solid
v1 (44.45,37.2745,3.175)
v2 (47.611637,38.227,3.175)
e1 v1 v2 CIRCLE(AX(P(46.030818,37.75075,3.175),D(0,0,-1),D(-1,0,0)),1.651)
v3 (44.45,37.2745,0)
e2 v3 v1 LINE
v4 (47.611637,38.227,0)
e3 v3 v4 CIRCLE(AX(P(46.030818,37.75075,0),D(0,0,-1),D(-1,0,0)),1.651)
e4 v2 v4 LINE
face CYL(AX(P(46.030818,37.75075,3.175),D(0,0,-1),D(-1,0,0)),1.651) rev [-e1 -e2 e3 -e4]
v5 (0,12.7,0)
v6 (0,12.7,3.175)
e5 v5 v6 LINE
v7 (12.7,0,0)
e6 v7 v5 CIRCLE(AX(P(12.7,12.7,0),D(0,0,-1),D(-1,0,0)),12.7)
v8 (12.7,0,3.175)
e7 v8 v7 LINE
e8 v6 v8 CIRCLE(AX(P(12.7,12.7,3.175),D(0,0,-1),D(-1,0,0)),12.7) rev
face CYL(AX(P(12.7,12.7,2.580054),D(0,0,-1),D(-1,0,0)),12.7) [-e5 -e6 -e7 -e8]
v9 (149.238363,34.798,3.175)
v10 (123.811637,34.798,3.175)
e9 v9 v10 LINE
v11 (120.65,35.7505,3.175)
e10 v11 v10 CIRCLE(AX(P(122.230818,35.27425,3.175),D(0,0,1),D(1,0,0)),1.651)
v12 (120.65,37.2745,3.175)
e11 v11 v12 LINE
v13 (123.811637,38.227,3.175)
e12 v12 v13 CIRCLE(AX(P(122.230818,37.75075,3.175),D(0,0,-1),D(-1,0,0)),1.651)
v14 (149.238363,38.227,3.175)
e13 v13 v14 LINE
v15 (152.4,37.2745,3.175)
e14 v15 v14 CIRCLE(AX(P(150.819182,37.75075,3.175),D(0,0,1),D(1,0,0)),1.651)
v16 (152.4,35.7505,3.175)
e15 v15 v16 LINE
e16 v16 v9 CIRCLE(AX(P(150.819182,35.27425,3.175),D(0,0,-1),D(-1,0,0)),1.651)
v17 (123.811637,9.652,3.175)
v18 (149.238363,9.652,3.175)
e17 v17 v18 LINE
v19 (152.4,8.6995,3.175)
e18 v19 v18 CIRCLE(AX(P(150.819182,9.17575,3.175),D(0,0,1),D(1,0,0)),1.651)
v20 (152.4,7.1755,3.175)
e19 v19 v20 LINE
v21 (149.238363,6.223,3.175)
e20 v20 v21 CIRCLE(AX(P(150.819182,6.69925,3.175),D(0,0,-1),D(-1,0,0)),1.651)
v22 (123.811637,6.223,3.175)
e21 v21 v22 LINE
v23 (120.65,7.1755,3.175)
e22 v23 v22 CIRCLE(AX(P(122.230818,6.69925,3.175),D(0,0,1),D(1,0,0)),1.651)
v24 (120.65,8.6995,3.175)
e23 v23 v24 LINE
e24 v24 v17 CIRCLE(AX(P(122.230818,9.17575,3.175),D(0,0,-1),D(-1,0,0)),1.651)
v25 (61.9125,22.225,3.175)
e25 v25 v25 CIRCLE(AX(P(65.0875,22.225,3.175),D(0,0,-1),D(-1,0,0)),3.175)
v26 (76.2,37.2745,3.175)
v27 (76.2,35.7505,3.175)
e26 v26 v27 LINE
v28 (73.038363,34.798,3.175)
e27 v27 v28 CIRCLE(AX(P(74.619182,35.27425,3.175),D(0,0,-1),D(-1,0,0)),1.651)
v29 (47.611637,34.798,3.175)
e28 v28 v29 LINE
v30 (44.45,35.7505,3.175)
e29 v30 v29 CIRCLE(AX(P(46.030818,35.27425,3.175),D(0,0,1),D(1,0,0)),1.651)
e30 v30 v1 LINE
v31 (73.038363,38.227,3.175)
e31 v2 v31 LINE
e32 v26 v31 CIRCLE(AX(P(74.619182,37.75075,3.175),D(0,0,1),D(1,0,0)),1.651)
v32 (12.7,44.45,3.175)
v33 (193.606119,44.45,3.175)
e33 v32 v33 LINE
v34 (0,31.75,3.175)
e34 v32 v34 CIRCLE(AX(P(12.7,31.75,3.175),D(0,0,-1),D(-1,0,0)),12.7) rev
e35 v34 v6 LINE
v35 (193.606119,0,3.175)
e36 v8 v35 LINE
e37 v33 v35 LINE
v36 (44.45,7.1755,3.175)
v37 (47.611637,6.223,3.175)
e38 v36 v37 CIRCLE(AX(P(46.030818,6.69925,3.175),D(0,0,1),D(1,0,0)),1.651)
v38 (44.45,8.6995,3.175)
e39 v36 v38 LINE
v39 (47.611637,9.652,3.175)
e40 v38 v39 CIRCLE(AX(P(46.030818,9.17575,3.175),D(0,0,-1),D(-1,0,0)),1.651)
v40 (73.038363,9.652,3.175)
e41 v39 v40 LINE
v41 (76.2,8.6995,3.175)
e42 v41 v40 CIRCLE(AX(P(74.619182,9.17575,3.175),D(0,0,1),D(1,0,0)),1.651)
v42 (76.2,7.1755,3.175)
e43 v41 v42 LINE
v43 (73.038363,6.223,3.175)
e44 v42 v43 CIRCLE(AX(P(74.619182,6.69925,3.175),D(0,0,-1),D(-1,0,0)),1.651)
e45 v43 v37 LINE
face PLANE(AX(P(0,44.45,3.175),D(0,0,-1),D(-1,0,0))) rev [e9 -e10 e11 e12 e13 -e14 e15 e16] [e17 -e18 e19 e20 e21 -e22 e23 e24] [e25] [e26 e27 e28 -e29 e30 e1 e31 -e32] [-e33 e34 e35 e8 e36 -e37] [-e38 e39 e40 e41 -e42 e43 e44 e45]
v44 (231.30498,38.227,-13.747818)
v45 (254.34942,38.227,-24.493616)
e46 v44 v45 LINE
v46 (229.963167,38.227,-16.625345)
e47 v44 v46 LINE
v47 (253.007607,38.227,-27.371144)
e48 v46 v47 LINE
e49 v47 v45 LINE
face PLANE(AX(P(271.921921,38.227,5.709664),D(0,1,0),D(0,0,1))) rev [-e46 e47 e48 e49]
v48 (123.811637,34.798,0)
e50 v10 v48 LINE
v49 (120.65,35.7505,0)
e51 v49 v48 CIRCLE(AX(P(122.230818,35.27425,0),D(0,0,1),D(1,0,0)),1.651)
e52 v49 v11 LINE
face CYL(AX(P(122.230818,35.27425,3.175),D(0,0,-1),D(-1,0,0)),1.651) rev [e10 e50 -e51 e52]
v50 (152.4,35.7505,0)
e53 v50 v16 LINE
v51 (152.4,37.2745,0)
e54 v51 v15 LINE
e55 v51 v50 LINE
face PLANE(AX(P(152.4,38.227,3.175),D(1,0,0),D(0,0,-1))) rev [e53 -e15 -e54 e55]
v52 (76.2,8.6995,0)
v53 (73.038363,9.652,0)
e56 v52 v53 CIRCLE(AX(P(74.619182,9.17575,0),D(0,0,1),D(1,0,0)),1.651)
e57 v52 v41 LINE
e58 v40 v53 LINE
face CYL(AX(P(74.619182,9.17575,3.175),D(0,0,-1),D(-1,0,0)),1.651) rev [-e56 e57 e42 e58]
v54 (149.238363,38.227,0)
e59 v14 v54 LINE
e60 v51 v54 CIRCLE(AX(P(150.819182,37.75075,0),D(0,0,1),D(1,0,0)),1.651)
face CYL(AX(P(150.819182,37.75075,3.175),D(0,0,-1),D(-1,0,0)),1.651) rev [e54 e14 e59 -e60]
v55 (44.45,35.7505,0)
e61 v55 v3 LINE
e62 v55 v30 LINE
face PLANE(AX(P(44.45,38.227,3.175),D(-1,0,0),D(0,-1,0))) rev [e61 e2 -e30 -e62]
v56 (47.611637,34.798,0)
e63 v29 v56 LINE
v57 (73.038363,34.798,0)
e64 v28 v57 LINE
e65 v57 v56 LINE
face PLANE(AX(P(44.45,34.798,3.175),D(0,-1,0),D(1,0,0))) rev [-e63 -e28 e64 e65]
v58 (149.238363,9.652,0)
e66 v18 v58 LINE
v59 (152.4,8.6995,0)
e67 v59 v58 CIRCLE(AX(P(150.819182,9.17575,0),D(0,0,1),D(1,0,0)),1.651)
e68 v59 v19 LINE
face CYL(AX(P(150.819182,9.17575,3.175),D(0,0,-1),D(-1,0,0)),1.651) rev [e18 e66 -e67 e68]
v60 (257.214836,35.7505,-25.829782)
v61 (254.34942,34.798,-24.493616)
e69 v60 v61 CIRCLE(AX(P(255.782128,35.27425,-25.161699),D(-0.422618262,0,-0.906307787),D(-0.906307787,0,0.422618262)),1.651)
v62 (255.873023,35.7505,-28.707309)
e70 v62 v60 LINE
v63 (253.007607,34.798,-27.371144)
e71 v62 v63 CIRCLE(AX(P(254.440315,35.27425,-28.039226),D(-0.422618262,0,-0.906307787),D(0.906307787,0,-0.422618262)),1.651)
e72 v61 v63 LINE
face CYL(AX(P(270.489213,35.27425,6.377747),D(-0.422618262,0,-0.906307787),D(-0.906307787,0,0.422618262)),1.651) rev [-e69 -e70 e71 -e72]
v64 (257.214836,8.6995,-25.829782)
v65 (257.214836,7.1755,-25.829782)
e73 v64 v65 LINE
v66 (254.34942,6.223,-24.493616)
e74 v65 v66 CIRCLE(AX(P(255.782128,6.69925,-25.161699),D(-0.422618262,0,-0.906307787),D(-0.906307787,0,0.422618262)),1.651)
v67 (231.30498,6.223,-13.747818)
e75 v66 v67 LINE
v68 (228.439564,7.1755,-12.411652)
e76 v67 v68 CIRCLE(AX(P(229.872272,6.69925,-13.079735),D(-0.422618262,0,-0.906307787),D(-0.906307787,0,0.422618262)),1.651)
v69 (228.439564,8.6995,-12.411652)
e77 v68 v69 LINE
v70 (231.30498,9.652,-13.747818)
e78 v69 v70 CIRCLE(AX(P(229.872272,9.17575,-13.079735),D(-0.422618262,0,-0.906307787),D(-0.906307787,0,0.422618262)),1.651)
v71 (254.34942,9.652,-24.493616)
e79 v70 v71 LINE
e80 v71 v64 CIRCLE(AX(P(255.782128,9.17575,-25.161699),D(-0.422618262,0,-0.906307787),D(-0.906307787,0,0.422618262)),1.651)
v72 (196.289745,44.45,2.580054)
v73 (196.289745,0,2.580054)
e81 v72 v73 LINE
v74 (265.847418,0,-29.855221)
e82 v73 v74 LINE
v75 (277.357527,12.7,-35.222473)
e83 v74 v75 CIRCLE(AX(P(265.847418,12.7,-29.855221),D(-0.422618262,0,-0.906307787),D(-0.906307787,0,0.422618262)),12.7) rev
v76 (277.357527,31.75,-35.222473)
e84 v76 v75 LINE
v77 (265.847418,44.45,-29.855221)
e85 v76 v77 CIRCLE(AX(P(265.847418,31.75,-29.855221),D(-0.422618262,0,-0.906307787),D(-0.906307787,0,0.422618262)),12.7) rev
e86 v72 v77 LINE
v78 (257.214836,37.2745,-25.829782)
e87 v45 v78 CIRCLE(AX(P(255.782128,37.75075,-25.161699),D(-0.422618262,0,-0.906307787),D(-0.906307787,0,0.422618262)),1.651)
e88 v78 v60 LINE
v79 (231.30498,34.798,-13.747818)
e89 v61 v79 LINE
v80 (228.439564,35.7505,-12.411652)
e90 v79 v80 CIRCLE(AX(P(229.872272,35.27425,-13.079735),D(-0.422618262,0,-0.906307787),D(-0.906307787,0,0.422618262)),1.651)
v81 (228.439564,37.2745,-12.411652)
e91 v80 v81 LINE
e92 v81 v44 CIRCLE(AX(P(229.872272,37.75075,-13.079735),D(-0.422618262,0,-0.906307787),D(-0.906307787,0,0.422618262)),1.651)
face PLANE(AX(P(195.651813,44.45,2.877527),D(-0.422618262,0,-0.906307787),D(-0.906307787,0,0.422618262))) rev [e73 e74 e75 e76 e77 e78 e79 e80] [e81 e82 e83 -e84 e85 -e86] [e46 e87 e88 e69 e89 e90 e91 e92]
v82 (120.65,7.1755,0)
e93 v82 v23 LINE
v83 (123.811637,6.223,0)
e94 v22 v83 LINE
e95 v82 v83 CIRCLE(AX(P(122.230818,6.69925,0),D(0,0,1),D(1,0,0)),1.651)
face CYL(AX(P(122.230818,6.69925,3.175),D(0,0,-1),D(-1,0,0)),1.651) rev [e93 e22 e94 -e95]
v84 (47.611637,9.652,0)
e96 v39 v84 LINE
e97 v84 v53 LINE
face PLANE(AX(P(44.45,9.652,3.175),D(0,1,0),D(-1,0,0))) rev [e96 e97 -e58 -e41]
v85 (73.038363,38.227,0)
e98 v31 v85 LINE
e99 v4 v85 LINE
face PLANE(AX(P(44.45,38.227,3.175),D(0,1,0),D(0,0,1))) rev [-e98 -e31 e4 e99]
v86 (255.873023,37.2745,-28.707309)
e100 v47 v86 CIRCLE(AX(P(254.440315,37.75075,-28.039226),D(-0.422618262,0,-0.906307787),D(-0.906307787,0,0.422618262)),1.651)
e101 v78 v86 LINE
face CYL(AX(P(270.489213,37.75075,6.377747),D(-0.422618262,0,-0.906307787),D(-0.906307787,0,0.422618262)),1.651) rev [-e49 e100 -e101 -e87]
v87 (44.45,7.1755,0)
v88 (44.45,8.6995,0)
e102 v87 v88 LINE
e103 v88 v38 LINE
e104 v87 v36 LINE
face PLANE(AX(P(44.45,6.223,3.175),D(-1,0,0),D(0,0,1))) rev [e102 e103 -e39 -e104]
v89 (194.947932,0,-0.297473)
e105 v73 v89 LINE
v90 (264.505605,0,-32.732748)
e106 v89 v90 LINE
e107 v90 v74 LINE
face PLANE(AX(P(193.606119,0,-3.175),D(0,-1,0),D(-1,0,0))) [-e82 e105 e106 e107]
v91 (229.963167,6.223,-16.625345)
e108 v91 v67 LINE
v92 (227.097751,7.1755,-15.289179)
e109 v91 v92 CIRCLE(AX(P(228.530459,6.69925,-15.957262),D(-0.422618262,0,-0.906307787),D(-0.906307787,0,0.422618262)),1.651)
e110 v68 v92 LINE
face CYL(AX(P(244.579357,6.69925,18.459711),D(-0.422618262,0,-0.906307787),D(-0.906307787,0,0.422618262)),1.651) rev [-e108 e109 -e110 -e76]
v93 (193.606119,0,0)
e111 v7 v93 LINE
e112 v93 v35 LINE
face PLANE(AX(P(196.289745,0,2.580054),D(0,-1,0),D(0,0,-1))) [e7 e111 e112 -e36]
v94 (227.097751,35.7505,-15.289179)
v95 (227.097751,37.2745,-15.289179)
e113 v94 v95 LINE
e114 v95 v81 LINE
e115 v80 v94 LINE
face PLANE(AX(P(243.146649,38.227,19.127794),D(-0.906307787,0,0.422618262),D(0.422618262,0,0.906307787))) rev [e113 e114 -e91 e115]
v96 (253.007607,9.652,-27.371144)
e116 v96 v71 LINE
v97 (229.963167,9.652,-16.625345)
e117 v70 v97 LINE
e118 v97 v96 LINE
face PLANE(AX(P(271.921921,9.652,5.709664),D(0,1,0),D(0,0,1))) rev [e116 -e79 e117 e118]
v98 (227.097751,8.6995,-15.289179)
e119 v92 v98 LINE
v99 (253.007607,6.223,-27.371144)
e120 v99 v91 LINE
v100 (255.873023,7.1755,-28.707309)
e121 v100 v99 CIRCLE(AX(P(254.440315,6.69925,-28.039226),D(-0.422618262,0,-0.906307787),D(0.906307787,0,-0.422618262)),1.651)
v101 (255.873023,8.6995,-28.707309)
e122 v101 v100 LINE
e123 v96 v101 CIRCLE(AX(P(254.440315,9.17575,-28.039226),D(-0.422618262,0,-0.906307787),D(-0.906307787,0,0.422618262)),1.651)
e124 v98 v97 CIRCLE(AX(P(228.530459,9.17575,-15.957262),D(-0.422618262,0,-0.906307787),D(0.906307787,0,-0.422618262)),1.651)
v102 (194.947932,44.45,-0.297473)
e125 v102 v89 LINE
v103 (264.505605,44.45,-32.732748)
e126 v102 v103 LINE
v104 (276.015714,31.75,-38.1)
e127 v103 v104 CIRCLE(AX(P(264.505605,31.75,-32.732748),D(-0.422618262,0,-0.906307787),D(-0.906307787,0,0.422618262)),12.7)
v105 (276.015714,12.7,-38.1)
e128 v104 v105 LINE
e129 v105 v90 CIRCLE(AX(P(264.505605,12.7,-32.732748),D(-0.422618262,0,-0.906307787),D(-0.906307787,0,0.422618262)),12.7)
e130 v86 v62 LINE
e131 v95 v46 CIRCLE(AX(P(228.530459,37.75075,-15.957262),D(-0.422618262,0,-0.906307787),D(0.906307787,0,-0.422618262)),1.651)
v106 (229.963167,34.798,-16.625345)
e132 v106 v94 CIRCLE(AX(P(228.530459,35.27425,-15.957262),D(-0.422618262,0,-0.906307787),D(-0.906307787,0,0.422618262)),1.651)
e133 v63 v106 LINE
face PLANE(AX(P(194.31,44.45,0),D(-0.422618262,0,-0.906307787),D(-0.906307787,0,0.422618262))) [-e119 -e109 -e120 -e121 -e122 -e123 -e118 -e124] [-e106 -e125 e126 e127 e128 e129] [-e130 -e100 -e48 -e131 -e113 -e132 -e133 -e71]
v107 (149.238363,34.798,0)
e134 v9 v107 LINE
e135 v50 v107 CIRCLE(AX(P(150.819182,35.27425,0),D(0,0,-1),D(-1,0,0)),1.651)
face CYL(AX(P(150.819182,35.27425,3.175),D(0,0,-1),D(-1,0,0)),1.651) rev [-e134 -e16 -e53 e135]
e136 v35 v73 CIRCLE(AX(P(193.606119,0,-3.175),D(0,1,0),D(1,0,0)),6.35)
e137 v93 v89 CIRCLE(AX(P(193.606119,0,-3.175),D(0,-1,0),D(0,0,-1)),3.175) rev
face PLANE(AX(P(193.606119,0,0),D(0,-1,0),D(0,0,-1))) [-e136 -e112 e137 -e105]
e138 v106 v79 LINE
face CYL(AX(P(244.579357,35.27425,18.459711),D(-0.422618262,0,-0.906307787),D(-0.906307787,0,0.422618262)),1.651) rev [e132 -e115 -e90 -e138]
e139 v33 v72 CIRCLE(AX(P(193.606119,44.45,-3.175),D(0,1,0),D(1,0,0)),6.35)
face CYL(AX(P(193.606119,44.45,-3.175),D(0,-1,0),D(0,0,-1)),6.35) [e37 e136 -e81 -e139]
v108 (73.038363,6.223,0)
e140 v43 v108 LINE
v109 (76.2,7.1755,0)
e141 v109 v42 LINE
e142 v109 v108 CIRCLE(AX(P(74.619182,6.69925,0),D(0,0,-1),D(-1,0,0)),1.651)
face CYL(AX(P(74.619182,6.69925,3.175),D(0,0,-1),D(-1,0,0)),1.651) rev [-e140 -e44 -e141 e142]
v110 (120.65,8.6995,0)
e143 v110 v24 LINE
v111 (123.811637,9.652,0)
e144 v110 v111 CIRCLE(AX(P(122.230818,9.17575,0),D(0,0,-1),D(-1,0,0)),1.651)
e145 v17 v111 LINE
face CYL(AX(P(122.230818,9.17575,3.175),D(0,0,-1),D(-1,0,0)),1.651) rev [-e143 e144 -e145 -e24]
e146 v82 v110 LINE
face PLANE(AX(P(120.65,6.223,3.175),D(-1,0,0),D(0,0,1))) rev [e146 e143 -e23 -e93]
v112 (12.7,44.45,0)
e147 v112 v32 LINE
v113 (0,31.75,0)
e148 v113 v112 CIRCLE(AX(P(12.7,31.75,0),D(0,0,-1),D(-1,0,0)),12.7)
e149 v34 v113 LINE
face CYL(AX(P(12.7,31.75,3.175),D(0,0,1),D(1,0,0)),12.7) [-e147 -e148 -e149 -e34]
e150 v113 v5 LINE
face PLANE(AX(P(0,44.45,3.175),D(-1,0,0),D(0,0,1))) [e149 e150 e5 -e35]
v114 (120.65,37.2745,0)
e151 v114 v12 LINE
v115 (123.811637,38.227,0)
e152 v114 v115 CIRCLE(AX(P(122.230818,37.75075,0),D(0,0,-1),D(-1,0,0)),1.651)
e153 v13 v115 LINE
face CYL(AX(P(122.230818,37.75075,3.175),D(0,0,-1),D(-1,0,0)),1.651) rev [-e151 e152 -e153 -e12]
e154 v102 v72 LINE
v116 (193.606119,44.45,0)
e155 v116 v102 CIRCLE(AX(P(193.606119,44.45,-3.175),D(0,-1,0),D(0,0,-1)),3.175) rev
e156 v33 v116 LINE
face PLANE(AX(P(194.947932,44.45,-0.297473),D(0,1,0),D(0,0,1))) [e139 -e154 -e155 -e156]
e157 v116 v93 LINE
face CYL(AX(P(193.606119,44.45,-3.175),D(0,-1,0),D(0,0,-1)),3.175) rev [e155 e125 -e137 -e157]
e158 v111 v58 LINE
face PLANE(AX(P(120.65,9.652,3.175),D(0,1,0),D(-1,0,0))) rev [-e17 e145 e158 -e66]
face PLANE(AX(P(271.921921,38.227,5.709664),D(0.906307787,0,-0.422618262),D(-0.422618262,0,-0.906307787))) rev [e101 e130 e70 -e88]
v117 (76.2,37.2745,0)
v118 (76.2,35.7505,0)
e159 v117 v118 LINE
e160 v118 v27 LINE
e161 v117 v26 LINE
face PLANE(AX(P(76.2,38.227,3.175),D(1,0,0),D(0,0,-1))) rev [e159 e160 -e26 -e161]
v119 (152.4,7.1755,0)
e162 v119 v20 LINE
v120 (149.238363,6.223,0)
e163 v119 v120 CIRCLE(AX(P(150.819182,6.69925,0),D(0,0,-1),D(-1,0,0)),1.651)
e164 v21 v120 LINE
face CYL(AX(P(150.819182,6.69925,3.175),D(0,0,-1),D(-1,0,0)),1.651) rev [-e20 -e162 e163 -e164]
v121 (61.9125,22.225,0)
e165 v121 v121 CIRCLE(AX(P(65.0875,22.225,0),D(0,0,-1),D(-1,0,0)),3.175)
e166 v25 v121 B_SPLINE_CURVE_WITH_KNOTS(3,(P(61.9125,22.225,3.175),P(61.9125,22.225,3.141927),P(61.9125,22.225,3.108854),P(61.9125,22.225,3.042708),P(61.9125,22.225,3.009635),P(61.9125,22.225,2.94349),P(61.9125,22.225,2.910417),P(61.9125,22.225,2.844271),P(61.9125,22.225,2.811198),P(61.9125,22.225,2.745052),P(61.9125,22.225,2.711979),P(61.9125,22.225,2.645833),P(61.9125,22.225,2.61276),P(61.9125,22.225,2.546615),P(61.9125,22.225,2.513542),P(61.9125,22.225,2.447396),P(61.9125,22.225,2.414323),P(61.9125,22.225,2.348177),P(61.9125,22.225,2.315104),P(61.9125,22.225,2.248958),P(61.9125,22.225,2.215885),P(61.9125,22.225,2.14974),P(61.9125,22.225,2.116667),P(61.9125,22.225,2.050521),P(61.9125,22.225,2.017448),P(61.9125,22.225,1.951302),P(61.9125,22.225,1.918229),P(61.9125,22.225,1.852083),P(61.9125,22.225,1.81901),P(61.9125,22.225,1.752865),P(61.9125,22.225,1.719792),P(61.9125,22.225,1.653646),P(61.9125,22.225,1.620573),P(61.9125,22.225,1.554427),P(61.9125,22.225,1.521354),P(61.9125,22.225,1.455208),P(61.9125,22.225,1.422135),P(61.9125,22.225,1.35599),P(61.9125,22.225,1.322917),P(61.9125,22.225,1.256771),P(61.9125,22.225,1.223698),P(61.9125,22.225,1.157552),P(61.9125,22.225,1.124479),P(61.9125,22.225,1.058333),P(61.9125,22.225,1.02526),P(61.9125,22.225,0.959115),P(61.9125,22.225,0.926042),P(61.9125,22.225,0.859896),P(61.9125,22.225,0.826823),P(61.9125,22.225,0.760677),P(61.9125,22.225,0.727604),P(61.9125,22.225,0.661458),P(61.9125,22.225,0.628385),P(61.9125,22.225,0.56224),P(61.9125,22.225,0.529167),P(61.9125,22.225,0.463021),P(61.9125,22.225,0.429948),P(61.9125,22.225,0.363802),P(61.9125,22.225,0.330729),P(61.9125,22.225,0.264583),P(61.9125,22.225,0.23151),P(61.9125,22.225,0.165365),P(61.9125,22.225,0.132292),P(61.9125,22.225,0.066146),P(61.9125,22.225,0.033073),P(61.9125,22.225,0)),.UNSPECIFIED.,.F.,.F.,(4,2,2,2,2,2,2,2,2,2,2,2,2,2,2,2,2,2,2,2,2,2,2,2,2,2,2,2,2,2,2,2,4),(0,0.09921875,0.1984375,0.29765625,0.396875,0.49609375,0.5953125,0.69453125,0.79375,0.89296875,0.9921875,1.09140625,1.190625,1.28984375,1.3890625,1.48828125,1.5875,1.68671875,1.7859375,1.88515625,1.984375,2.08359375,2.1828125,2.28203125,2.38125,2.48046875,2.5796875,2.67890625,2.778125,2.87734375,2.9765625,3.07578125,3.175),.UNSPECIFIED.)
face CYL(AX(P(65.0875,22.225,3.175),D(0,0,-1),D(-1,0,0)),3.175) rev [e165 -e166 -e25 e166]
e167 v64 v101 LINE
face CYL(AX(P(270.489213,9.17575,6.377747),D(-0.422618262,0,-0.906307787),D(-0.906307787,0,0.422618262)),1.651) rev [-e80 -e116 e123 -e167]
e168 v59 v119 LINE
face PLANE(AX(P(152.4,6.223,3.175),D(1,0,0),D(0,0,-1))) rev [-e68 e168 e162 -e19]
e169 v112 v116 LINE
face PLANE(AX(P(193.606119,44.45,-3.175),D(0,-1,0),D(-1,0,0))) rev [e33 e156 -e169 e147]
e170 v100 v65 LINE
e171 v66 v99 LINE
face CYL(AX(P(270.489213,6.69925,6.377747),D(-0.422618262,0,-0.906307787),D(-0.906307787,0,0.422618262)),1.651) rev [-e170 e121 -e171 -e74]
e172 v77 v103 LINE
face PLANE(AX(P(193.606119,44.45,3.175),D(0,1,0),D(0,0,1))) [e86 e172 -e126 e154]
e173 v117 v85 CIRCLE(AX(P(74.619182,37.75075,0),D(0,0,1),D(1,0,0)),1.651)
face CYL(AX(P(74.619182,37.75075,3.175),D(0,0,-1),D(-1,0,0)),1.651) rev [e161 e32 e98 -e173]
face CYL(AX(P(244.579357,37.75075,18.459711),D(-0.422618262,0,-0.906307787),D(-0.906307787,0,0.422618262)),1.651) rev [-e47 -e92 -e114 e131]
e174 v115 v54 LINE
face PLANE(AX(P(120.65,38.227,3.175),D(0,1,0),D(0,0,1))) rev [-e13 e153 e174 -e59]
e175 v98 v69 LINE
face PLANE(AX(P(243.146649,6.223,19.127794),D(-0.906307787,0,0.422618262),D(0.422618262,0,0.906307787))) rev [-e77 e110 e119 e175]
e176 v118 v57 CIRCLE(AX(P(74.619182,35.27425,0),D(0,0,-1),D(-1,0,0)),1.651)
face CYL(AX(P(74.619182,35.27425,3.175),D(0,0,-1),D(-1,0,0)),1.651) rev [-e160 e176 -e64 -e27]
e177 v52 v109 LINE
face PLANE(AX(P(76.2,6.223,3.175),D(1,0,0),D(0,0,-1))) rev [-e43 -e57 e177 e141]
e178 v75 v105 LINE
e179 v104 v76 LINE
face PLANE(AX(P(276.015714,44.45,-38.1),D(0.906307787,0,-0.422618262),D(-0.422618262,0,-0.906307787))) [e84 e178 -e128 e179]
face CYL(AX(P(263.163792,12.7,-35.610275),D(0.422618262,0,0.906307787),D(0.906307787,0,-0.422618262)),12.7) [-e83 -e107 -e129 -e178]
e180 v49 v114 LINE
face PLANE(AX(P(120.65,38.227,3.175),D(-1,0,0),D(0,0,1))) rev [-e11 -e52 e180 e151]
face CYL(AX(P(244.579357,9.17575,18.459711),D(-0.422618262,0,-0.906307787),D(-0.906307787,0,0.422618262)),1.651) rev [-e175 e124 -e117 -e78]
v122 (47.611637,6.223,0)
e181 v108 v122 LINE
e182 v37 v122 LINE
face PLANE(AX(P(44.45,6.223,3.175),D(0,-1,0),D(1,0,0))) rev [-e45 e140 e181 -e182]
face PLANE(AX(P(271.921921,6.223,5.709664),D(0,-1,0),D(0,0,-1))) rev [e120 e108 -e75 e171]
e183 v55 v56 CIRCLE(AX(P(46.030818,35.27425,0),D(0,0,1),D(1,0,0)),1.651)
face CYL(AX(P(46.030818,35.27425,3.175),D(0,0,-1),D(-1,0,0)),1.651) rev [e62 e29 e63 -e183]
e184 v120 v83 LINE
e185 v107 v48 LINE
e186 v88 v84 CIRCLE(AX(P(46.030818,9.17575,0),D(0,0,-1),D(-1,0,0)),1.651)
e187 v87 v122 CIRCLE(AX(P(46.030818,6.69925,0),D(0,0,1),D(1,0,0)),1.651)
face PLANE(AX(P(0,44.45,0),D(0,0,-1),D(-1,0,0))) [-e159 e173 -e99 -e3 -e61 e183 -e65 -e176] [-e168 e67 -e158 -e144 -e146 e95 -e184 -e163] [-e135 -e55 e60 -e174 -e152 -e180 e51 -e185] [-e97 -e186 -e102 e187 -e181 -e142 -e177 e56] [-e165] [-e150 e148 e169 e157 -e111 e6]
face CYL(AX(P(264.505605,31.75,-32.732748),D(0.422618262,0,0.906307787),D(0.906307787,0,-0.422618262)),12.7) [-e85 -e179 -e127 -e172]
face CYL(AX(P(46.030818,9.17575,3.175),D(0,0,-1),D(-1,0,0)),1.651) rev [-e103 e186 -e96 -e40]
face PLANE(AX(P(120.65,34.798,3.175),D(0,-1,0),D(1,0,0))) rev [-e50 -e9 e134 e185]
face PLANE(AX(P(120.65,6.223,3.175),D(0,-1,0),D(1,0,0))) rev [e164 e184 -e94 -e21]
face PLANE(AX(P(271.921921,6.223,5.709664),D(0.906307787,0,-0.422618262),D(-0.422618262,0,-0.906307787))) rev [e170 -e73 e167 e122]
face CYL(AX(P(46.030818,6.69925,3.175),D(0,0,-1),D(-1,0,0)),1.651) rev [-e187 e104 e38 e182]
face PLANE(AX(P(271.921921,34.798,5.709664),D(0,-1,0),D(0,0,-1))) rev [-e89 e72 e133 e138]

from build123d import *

# Parameters (mm, degrees)
BASE_FLANGE1_DEPTH = 44.45
SKETCH6_W          = 31.75
SKETCH6_H          = 3.429
CUT_EXTRUDE1_DEPTH = 284.468887342
SKETCH7_W          = 31.75
SKETCH7_H          = 3.429
CUT_EXTRUDE2_DEPTH = 272.141941158
FILLET1_R          = 12.7
CUT_EXTRUDE3_DEPTH = 284.468887342
CUT_EXTRUDE4_DEPTH = 272.141941158
SKETCH10_R         = 3.175
CUT_EXTRUDE5_DEPTH = 284.468887342


# Sheet-metal steps are written as plain solids
with BuildPart() as part:
    # Sketch1 → Base-Flange1 (new body)
    with BuildSketch(Plane(origin=(0, 0, 0), x_dir=(1, 0, 0), z_dir=(0, 1, 0))):
        with BuildLine():
            Line((0, 0), (193.606119446, 0))
            ThreePointArc((193.606119446, 0), (194.29331522, 0.075260177), (194.947932427, 0.297472776))
            Line((194.947932427, 0.297472776), (276.015713671, 38.1))
            Line((276.015713671, 38.1), (277.357526652, 35.222472776))
            Line((277.357526652, 35.222472776), (196.289745408, -2.580054448))
            ThreePointArc((196.289745408, -2.580054448), (194.980510995, -3.024479645), (193.606119446, -3.175))
            Line((193.606119446, -3.175), (0, -3.175))
            Line((0, -3.175), (0, 0))
        make_face()
    extrude(amount=BASE_FLANGE1_DEPTH)

    # Sketch6 → Cut-Extrude1 (cut, through all)
    with BuildSketch(Plane(origin=(0, 0, 0), x_dir=(-1, 0, 0), z_dir=(0, 0, -1))):
        with Locations((-136.525, 7.9375)):
            Rectangle(SKETCH6_W, SKETCH6_H)
        with Locations((-60.325, 36.5125)):
            Rectangle(SKETCH6_W, SKETCH6_H)
        with Locations((-136.525, 36.5125)):
            Rectangle(SKETCH6_W, SKETCH6_H)
        with Locations((-60.325, 7.9375)):
            Rectangle(SKETCH6_W, SKETCH6_H)
    extrude(amount=-CUT_EXTRUDE1_DEPTH, mode=Mode.SUBTRACT)

    # Sketch7 → Cut-Extrude2 (cut, through all)
    with BuildSketch(Plane(origin=(34.704969781, 0, 74.425047871), x_dir=(-0.9063077870366493, 0, 0.42261826174070083), z_dir=(-0.4226182617407009, 0, -0.9063077870366494))):
        with Locations((-228.156946417, 36.5125)):
            Rectangle(SKETCH7_W, SKETCH7_H)
        with Locations((-228.156946417, 7.9375)):
            Rectangle(SKETCH7_W, SKETCH7_H)
    extrude(amount=-CUT_EXTRUDE2_DEPTH, mode=Mode.SUBTRACT)

    # Fillet1
    fillet1_edges = [part.edges().sort_by_distance(p)[0] for p in [
        (0, 44.45, 1.5875),
        (0, 0, 1.5875),
        (276.686620162, 44.45, -36.661236388),
        (276.686620162, 0, -36.661236388),
    ]]
    fillet(fillet1_edges, radius=FILLET1_R)

    # Sketch8 → Cut-Extrude3 (cut, through all)
    with BuildSketch(Plane(origin=(0, 0, 0), x_dir=(-1, 0, 0), z_dir=(0, 0, -1))):
        with BuildLine():
            ThreePointArc((-44.938784585, 36.5125), (-46.030818439, 39.40175), (-47.122852293, 36.5125))
            ThreePointArc((-47.122852293, 36.5125), (-46.030818439, 33.62325), (-44.938784585, 36.5125))
        make_face()
        with BuildLine():
            ThreePointArc((-75.711215415, 36.5125), (-74.619181561, 33.62325), (-73.527147707, 36.5125))
            ThreePointArc((-73.527147707, 36.5125), (-74.619181561, 39.40175), (-75.711215415, 36.5125))
        make_face()
        with BuildLine():
            ThreePointArc((-121.138784585, 36.5125), (-122.230818439, 39.40175), (-123.322852293, 36.5125))
            ThreePointArc((-123.322852293, 36.5125), (-122.230818439, 33.62325), (-121.138784585, 36.5125))
        make_face()
        with BuildLine():
            ThreePointArc((-151.911215415, 36.5125), (-150.819181561, 33.62325), (-149.727147707, 36.5125))
            ThreePointArc((-149.727147707, 36.5125), (-150.819181561, 39.40175), (-151.911215415, 36.5125))
        make_face()
        with BuildLine():
            ThreePointArc((-151.911215415, 7.9375), (-150.819181561, 5.04825), (-149.727147707, 7.9375))
            ThreePointArc((-149.727147707, 7.9375), (-150.819181561, 10.82675), (-151.911215415, 7.9375))
        make_face()
        with BuildLine():
            ThreePointArc((-121.138784585, 7.9375), (-122.230818439, 10.82675), (-123.322852293, 7.9375))
            ThreePointArc((-123.322852293, 7.9375), (-122.230818439, 5.04825), (-121.138784585, 7.9375))
        make_face()
        with BuildLine():
            ThreePointArc((-75.711215415, 7.9375), (-74.619181561, 5.04825), (-73.527147707, 7.9375))
            ThreePointArc((-73.527147707, 7.9375), (-74.619181561, 10.82675), (-75.711215415, 7.9375))
        make_face()
        with BuildLine():
            ThreePointArc((-44.938784585, 7.9375), (-46.030818439, 10.82675), (-47.122852293, 7.9375))
            ThreePointArc((-47.122852293, 7.9375), (-46.030818439, 5.04825), (-44.938784585, 7.9375))
        make_face()
    extrude(amount=-CUT_EXTRUDE3_DEPTH, mode=Mode.SUBTRACT)

    # Sketch9 → Cut-Extrude4 (cut, through all)
    with BuildSketch(Plane(origin=(34.704969781, 0, 74.425047871), x_dir=(-0.9063077870366492, 0, 0.42261826174070116), z_dir=(-0.42261826174070116, 0, -0.9063077870366492))):
        with BuildLine():
            ThreePointArc((-214.95479871, 36.5125), (-213.862764856, 33.62325), (-212.770731003, 36.5125))
            ThreePointArc((-212.770731003, 36.5125), (-213.862764856, 39.40175), (-214.95479871, 36.5125))
        make_face()
        with BuildLine():
            ThreePointArc((-241.359094124, 36.5125), (-242.451127978, 39.40175), (-243.543161832, 36.5125))
            ThreePointArc((-243.543161832, 36.5125), (-242.451127978, 33.62325), (-241.359094124, 36.5125))
        make_face()
        with BuildLine():
            ThreePointArc((-241.359094124, 7.9375), (-242.451127978, 10.82675), (-243.543161832, 7.9375))
            ThreePointArc((-243.543161832, 7.9375), (-242.451127978, 5.04825), (-241.359094124, 7.9375))
        make_face()
        with BuildLine():
            ThreePointArc((-214.95479871, 7.9375), (-213.862764856, 5.04825), (-212.770731003, 7.9375))
            ThreePointArc((-212.770731003, 7.9375), (-213.862764856, 10.82675), (-214.95479871, 7.9375))
        make_face()
    extrude(amount=-CUT_EXTRUDE4_DEPTH, mode=Mode.SUBTRACT)

    # Sketch10 → Cut-Extrude5 (cut, through all)
    with BuildSketch(Plane(origin=(0, 0, 0), x_dir=(-1, 0, 0), z_dir=(0, 0, -1))):
        with Locations((-65.0875, 22.225)):
            Circle(SKETCH10_R)
    extrude(amount=-CUT_EXTRUDE5_DEPTH, mode=Mode.SUBTRACT)


solid = part.part
